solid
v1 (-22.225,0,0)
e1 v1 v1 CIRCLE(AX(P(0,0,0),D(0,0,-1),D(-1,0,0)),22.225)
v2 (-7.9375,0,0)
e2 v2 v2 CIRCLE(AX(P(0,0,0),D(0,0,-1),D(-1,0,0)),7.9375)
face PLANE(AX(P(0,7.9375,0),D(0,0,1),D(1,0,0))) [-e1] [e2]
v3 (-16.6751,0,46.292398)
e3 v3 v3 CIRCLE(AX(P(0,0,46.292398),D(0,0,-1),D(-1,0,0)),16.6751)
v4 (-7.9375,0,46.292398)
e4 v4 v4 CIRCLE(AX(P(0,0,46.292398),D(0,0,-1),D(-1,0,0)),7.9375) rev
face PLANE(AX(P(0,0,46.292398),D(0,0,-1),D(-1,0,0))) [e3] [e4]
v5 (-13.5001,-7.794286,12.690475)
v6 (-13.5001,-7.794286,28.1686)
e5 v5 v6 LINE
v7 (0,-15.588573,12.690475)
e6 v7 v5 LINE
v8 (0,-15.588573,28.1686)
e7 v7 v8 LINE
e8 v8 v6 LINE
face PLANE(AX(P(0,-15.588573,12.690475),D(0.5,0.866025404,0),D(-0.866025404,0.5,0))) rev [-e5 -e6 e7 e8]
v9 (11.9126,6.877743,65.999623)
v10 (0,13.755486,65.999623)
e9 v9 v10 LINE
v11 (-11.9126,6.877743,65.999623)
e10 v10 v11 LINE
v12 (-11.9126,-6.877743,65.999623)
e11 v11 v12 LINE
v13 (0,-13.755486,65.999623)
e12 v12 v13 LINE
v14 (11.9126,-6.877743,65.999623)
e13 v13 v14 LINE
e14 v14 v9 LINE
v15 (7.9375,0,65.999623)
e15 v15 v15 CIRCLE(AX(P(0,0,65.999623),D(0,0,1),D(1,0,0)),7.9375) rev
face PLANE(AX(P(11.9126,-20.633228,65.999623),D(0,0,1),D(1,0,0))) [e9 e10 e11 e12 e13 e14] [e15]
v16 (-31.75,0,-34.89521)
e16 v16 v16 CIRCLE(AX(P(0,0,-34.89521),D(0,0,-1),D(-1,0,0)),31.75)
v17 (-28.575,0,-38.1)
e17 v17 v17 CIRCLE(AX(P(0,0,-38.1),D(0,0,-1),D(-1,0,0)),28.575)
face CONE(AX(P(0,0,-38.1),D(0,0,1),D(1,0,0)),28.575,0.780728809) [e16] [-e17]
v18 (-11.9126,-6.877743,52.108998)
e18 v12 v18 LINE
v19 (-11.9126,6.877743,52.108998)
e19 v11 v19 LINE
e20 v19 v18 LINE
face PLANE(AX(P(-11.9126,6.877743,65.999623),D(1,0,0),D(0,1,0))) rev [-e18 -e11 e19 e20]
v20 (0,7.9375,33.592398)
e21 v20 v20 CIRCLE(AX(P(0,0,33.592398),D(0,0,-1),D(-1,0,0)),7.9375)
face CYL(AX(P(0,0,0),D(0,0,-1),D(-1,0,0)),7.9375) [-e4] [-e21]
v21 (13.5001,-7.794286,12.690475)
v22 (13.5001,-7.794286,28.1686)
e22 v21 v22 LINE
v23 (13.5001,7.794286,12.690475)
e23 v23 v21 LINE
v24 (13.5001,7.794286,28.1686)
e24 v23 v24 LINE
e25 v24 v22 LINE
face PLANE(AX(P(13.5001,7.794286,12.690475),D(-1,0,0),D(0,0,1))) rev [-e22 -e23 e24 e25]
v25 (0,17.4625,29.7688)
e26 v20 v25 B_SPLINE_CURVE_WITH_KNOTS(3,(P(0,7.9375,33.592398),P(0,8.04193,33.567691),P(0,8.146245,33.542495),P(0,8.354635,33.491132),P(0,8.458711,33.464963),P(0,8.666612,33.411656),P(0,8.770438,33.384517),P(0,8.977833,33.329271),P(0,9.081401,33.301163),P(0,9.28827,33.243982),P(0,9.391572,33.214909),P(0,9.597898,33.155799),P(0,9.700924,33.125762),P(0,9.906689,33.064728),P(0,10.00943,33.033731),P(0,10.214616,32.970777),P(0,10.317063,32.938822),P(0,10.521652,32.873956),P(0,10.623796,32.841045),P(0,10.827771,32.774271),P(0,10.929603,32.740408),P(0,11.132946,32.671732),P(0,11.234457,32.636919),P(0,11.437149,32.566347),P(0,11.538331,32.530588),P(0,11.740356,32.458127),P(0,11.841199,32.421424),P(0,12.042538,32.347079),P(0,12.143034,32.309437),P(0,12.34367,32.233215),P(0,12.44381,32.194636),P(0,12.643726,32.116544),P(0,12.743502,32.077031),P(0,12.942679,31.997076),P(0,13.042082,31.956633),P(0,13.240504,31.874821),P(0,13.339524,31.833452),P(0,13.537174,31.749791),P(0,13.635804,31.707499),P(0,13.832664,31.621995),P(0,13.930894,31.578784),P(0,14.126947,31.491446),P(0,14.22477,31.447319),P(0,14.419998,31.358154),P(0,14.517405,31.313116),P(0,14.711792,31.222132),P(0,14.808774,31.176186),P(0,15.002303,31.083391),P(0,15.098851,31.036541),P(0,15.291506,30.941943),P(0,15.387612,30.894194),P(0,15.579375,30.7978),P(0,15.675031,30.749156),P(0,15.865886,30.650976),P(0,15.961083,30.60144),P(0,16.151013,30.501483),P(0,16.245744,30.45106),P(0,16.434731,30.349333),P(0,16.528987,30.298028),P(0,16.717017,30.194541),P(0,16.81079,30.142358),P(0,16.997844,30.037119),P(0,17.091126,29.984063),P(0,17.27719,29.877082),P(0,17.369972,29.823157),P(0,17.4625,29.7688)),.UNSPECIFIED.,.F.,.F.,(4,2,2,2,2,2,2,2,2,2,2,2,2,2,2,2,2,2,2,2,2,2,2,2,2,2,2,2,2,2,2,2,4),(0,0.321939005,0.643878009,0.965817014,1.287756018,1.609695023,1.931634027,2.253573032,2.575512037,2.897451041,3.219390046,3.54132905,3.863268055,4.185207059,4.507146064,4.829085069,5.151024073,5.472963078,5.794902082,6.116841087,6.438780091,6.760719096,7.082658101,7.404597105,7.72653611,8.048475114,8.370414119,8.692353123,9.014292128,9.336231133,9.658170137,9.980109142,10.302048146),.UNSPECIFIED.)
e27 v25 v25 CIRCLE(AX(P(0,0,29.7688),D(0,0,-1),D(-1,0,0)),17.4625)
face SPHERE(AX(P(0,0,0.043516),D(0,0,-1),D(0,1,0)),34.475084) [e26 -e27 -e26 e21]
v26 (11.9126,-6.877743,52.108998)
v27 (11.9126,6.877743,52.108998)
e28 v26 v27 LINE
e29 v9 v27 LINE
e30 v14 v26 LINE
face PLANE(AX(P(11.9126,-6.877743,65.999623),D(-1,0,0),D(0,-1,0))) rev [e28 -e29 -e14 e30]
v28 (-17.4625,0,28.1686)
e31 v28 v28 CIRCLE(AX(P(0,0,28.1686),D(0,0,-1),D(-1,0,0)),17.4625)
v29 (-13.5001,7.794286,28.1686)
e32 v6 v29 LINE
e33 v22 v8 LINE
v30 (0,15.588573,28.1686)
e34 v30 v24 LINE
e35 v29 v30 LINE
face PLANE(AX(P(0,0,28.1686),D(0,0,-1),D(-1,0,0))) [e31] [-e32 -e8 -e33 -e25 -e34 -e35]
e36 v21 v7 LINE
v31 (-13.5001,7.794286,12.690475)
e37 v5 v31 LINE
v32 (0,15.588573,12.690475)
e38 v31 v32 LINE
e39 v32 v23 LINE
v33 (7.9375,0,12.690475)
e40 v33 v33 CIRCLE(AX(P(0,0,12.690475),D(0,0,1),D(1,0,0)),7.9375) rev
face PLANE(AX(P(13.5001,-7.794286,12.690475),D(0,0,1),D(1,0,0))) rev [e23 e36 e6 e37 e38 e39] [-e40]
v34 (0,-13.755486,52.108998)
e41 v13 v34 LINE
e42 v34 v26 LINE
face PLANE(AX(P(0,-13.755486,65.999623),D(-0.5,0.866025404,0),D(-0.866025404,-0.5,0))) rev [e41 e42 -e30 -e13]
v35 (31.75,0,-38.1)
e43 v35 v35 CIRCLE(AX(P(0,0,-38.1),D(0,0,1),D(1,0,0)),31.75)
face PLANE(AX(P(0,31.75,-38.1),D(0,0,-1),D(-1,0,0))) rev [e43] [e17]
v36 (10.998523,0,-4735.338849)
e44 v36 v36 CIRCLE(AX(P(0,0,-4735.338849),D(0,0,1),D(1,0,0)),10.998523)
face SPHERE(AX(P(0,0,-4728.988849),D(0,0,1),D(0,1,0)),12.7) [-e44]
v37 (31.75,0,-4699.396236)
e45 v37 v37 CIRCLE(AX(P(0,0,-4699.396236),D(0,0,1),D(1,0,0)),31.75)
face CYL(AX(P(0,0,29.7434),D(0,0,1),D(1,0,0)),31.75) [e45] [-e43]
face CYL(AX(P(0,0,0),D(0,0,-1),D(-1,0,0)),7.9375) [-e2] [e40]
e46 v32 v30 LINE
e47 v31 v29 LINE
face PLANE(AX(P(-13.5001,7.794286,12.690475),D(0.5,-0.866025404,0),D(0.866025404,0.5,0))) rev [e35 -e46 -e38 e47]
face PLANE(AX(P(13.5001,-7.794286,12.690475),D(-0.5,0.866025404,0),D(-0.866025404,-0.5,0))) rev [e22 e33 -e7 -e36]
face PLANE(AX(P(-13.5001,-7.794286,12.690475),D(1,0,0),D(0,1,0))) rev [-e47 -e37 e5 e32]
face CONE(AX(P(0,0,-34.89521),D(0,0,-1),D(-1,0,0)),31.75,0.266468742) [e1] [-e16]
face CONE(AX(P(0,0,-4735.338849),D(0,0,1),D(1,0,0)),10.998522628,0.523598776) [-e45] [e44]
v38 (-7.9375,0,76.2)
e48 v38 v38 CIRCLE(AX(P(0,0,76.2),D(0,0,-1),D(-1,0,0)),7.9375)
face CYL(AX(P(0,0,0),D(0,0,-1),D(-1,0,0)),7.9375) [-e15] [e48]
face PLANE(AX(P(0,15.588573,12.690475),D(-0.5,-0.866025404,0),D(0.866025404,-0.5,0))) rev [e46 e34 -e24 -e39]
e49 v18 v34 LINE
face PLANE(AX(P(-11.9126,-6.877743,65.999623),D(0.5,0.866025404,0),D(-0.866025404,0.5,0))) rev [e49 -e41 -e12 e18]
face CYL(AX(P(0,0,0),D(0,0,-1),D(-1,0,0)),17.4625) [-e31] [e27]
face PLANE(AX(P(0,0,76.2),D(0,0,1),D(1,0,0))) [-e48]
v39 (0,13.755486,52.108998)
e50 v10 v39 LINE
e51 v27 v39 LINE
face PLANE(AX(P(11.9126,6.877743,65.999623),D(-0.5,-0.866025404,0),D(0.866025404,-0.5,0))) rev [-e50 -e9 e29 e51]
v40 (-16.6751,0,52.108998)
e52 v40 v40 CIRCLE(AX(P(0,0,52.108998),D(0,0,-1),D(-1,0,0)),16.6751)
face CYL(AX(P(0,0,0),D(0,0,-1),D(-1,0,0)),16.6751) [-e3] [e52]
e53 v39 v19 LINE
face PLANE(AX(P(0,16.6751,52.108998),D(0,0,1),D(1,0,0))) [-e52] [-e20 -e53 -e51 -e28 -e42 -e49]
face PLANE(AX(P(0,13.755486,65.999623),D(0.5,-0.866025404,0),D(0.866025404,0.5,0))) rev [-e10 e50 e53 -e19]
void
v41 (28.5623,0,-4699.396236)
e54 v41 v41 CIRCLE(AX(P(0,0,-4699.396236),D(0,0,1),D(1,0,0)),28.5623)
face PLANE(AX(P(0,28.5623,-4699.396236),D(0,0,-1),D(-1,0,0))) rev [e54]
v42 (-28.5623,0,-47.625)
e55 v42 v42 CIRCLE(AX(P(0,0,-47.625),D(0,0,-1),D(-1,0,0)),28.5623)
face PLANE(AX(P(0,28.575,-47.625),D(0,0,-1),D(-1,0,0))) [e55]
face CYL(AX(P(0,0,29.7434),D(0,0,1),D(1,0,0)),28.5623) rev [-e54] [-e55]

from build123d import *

# Parameters (mm, degrees)
BOSS_REVOLVE3_START         = 12.690475
BOSS_REVOLVE3_OUTLINE_R     = 7.9375
BOSS_REVOLVE3_DEPTH         = 15.478125
BOSS_REVOLVE3_START_2       = 46.292398399
BOSS_REVOLVE3_2_OUTLINE_R   = 16.6751
BOSS_REVOLVE3_2_OUTLINE_R_2 = 7.9375
BOSS_REVOLVE3_2_DEPTH       = 5.8166
BOSS_EXTRUDE2_DEPTH         = 13.890625


# Read off the part's stored shape, not the designer's step: Boss-Revolve3
with BuildPart() as part:
    # Sketch1 → Base-Revolve (revolve)
    with BuildSketch(Plane(origin=(0, 0, 0), x_dir=(0, 0, -1), z_dir=(1, 0, 0)), mode=Mode.PRIVATE) as base_revolve_sk:
        Polygon((-76.2, 0), (-76.2, 7.9375), (0, 7.9375), (0, 22.225), (34.895210283, 31.75), (38.1, 28.575), (47.625, 28.575), (47.625, 0), align=None)
    revolve(base_revolve_sk.sketch.rotate(Axis((0, 0, 0), (0, 0, 1)), 90), axis=Axis((0, 0, 0), (0, 0, 1)))

    # Sketch3 → Boss-Revolve2 (revolve)
    with BuildSketch(Plane(origin=(0, 0, 0), x_dir=(0, 0, -1), z_dir=(1, 0, 0)), mode=Mode.PRIVATE) as boss_revolve2_sk:
        with BuildLine():
            Line((-28.1686, 0), (-28.1686, 17.4625))
            Line((-28.1686, 17.4625), (-29.7688, 17.4625))
            ThreePointArc((-29.7688, 17.4625), (-33.309963658, 9.048473715), (-34.5186, 0))
            Line((-34.5186, 0), (-28.1686, 0))
        make_face()
    revolve(boss_revolve2_sk.sketch.rotate(Axis((0, 0, 0), (0, 0, 1)), 90), axis=Axis((0, 0, 0), (0, 0, 1)))

    # Sketch2 → Boss-Revolve1 (revolve)
    with BuildSketch(Plane(origin=(0, 0, 0), x_dir=(0, 0, -1), z_dir=(1, 0, 0)), mode=Mode.PRIVATE) as boss_revolve1_sk:
        with BuildLine():
            Line((38.1, 31.75), (38.1, 28.5623))
            Line((38.1, 28.5623), (4699.39623629, 28.5623))
            Line((4699.39623629, 28.5623), (4699.39623629, 0))
            Line((4699.39623629, 0), (4741.68884943, 0))
            ThreePointArc((4741.68884943, 0), (4739.987372059, 6.35), (4735.33884943, 10.998522628))
            Line((4735.33884943, 10.998522628), (4699.39623629, 31.75))
            Line((4699.39623629, 31.75), (38.1, 31.75))
        make_face()
    revolve(boss_revolve1_sk.sketch.rotate(Axis((0, 0, 29.7434), (0, 0, -1)), 90), axis=Axis((0, 0, 29.7434), (0, 0, -1)))

    # Boss-Revolve3 outline → Boss-Revolve3 (add)
    with BuildSketch(Plane.XY.offset(BOSS_REVOLVE3_START)):
        Polygon((0, -15.588572738), (13.5001, -7.794286369), (13.5001, 7.794286369), (0, 15.588572738), (-13.5001, 7.794286369), (-13.5001, -7.794286369), align=None)
        Circle(BOSS_REVOLVE3_OUTLINE_R, mode=Mode.SUBTRACT)
    extrude(amount=BOSS_REVOLVE3_DEPTH)

    # Boss-Revolve3 2 outline → Boss-Revolve3 2 (add)
    with BuildSketch(Plane.XY.offset(BOSS_REVOLVE3_START_2)):
        Circle(BOSS_REVOLVE3_2_OUTLINE_R)
        Circle(BOSS_REVOLVE3_2_OUTLINE_R_2, mode=Mode.SUBTRACT)
    extrude(amount=BOSS_REVOLVE3_2_DEPTH)

    # Sketch6 → Boss-Extrude2 (add)
    with BuildSketch(Plane.XY.offset(52.108998399)):
        Polygon((0, -13.755485633), (11.9126, -6.877742817), (11.9126, 6.877742817), (0, 13.755485633), (-11.9126, 6.877742817), (-11.9126, -6.877742817), align=None)
    extrude(amount=BOSS_EXTRUDE2_DEPTH)


solid = part.part
